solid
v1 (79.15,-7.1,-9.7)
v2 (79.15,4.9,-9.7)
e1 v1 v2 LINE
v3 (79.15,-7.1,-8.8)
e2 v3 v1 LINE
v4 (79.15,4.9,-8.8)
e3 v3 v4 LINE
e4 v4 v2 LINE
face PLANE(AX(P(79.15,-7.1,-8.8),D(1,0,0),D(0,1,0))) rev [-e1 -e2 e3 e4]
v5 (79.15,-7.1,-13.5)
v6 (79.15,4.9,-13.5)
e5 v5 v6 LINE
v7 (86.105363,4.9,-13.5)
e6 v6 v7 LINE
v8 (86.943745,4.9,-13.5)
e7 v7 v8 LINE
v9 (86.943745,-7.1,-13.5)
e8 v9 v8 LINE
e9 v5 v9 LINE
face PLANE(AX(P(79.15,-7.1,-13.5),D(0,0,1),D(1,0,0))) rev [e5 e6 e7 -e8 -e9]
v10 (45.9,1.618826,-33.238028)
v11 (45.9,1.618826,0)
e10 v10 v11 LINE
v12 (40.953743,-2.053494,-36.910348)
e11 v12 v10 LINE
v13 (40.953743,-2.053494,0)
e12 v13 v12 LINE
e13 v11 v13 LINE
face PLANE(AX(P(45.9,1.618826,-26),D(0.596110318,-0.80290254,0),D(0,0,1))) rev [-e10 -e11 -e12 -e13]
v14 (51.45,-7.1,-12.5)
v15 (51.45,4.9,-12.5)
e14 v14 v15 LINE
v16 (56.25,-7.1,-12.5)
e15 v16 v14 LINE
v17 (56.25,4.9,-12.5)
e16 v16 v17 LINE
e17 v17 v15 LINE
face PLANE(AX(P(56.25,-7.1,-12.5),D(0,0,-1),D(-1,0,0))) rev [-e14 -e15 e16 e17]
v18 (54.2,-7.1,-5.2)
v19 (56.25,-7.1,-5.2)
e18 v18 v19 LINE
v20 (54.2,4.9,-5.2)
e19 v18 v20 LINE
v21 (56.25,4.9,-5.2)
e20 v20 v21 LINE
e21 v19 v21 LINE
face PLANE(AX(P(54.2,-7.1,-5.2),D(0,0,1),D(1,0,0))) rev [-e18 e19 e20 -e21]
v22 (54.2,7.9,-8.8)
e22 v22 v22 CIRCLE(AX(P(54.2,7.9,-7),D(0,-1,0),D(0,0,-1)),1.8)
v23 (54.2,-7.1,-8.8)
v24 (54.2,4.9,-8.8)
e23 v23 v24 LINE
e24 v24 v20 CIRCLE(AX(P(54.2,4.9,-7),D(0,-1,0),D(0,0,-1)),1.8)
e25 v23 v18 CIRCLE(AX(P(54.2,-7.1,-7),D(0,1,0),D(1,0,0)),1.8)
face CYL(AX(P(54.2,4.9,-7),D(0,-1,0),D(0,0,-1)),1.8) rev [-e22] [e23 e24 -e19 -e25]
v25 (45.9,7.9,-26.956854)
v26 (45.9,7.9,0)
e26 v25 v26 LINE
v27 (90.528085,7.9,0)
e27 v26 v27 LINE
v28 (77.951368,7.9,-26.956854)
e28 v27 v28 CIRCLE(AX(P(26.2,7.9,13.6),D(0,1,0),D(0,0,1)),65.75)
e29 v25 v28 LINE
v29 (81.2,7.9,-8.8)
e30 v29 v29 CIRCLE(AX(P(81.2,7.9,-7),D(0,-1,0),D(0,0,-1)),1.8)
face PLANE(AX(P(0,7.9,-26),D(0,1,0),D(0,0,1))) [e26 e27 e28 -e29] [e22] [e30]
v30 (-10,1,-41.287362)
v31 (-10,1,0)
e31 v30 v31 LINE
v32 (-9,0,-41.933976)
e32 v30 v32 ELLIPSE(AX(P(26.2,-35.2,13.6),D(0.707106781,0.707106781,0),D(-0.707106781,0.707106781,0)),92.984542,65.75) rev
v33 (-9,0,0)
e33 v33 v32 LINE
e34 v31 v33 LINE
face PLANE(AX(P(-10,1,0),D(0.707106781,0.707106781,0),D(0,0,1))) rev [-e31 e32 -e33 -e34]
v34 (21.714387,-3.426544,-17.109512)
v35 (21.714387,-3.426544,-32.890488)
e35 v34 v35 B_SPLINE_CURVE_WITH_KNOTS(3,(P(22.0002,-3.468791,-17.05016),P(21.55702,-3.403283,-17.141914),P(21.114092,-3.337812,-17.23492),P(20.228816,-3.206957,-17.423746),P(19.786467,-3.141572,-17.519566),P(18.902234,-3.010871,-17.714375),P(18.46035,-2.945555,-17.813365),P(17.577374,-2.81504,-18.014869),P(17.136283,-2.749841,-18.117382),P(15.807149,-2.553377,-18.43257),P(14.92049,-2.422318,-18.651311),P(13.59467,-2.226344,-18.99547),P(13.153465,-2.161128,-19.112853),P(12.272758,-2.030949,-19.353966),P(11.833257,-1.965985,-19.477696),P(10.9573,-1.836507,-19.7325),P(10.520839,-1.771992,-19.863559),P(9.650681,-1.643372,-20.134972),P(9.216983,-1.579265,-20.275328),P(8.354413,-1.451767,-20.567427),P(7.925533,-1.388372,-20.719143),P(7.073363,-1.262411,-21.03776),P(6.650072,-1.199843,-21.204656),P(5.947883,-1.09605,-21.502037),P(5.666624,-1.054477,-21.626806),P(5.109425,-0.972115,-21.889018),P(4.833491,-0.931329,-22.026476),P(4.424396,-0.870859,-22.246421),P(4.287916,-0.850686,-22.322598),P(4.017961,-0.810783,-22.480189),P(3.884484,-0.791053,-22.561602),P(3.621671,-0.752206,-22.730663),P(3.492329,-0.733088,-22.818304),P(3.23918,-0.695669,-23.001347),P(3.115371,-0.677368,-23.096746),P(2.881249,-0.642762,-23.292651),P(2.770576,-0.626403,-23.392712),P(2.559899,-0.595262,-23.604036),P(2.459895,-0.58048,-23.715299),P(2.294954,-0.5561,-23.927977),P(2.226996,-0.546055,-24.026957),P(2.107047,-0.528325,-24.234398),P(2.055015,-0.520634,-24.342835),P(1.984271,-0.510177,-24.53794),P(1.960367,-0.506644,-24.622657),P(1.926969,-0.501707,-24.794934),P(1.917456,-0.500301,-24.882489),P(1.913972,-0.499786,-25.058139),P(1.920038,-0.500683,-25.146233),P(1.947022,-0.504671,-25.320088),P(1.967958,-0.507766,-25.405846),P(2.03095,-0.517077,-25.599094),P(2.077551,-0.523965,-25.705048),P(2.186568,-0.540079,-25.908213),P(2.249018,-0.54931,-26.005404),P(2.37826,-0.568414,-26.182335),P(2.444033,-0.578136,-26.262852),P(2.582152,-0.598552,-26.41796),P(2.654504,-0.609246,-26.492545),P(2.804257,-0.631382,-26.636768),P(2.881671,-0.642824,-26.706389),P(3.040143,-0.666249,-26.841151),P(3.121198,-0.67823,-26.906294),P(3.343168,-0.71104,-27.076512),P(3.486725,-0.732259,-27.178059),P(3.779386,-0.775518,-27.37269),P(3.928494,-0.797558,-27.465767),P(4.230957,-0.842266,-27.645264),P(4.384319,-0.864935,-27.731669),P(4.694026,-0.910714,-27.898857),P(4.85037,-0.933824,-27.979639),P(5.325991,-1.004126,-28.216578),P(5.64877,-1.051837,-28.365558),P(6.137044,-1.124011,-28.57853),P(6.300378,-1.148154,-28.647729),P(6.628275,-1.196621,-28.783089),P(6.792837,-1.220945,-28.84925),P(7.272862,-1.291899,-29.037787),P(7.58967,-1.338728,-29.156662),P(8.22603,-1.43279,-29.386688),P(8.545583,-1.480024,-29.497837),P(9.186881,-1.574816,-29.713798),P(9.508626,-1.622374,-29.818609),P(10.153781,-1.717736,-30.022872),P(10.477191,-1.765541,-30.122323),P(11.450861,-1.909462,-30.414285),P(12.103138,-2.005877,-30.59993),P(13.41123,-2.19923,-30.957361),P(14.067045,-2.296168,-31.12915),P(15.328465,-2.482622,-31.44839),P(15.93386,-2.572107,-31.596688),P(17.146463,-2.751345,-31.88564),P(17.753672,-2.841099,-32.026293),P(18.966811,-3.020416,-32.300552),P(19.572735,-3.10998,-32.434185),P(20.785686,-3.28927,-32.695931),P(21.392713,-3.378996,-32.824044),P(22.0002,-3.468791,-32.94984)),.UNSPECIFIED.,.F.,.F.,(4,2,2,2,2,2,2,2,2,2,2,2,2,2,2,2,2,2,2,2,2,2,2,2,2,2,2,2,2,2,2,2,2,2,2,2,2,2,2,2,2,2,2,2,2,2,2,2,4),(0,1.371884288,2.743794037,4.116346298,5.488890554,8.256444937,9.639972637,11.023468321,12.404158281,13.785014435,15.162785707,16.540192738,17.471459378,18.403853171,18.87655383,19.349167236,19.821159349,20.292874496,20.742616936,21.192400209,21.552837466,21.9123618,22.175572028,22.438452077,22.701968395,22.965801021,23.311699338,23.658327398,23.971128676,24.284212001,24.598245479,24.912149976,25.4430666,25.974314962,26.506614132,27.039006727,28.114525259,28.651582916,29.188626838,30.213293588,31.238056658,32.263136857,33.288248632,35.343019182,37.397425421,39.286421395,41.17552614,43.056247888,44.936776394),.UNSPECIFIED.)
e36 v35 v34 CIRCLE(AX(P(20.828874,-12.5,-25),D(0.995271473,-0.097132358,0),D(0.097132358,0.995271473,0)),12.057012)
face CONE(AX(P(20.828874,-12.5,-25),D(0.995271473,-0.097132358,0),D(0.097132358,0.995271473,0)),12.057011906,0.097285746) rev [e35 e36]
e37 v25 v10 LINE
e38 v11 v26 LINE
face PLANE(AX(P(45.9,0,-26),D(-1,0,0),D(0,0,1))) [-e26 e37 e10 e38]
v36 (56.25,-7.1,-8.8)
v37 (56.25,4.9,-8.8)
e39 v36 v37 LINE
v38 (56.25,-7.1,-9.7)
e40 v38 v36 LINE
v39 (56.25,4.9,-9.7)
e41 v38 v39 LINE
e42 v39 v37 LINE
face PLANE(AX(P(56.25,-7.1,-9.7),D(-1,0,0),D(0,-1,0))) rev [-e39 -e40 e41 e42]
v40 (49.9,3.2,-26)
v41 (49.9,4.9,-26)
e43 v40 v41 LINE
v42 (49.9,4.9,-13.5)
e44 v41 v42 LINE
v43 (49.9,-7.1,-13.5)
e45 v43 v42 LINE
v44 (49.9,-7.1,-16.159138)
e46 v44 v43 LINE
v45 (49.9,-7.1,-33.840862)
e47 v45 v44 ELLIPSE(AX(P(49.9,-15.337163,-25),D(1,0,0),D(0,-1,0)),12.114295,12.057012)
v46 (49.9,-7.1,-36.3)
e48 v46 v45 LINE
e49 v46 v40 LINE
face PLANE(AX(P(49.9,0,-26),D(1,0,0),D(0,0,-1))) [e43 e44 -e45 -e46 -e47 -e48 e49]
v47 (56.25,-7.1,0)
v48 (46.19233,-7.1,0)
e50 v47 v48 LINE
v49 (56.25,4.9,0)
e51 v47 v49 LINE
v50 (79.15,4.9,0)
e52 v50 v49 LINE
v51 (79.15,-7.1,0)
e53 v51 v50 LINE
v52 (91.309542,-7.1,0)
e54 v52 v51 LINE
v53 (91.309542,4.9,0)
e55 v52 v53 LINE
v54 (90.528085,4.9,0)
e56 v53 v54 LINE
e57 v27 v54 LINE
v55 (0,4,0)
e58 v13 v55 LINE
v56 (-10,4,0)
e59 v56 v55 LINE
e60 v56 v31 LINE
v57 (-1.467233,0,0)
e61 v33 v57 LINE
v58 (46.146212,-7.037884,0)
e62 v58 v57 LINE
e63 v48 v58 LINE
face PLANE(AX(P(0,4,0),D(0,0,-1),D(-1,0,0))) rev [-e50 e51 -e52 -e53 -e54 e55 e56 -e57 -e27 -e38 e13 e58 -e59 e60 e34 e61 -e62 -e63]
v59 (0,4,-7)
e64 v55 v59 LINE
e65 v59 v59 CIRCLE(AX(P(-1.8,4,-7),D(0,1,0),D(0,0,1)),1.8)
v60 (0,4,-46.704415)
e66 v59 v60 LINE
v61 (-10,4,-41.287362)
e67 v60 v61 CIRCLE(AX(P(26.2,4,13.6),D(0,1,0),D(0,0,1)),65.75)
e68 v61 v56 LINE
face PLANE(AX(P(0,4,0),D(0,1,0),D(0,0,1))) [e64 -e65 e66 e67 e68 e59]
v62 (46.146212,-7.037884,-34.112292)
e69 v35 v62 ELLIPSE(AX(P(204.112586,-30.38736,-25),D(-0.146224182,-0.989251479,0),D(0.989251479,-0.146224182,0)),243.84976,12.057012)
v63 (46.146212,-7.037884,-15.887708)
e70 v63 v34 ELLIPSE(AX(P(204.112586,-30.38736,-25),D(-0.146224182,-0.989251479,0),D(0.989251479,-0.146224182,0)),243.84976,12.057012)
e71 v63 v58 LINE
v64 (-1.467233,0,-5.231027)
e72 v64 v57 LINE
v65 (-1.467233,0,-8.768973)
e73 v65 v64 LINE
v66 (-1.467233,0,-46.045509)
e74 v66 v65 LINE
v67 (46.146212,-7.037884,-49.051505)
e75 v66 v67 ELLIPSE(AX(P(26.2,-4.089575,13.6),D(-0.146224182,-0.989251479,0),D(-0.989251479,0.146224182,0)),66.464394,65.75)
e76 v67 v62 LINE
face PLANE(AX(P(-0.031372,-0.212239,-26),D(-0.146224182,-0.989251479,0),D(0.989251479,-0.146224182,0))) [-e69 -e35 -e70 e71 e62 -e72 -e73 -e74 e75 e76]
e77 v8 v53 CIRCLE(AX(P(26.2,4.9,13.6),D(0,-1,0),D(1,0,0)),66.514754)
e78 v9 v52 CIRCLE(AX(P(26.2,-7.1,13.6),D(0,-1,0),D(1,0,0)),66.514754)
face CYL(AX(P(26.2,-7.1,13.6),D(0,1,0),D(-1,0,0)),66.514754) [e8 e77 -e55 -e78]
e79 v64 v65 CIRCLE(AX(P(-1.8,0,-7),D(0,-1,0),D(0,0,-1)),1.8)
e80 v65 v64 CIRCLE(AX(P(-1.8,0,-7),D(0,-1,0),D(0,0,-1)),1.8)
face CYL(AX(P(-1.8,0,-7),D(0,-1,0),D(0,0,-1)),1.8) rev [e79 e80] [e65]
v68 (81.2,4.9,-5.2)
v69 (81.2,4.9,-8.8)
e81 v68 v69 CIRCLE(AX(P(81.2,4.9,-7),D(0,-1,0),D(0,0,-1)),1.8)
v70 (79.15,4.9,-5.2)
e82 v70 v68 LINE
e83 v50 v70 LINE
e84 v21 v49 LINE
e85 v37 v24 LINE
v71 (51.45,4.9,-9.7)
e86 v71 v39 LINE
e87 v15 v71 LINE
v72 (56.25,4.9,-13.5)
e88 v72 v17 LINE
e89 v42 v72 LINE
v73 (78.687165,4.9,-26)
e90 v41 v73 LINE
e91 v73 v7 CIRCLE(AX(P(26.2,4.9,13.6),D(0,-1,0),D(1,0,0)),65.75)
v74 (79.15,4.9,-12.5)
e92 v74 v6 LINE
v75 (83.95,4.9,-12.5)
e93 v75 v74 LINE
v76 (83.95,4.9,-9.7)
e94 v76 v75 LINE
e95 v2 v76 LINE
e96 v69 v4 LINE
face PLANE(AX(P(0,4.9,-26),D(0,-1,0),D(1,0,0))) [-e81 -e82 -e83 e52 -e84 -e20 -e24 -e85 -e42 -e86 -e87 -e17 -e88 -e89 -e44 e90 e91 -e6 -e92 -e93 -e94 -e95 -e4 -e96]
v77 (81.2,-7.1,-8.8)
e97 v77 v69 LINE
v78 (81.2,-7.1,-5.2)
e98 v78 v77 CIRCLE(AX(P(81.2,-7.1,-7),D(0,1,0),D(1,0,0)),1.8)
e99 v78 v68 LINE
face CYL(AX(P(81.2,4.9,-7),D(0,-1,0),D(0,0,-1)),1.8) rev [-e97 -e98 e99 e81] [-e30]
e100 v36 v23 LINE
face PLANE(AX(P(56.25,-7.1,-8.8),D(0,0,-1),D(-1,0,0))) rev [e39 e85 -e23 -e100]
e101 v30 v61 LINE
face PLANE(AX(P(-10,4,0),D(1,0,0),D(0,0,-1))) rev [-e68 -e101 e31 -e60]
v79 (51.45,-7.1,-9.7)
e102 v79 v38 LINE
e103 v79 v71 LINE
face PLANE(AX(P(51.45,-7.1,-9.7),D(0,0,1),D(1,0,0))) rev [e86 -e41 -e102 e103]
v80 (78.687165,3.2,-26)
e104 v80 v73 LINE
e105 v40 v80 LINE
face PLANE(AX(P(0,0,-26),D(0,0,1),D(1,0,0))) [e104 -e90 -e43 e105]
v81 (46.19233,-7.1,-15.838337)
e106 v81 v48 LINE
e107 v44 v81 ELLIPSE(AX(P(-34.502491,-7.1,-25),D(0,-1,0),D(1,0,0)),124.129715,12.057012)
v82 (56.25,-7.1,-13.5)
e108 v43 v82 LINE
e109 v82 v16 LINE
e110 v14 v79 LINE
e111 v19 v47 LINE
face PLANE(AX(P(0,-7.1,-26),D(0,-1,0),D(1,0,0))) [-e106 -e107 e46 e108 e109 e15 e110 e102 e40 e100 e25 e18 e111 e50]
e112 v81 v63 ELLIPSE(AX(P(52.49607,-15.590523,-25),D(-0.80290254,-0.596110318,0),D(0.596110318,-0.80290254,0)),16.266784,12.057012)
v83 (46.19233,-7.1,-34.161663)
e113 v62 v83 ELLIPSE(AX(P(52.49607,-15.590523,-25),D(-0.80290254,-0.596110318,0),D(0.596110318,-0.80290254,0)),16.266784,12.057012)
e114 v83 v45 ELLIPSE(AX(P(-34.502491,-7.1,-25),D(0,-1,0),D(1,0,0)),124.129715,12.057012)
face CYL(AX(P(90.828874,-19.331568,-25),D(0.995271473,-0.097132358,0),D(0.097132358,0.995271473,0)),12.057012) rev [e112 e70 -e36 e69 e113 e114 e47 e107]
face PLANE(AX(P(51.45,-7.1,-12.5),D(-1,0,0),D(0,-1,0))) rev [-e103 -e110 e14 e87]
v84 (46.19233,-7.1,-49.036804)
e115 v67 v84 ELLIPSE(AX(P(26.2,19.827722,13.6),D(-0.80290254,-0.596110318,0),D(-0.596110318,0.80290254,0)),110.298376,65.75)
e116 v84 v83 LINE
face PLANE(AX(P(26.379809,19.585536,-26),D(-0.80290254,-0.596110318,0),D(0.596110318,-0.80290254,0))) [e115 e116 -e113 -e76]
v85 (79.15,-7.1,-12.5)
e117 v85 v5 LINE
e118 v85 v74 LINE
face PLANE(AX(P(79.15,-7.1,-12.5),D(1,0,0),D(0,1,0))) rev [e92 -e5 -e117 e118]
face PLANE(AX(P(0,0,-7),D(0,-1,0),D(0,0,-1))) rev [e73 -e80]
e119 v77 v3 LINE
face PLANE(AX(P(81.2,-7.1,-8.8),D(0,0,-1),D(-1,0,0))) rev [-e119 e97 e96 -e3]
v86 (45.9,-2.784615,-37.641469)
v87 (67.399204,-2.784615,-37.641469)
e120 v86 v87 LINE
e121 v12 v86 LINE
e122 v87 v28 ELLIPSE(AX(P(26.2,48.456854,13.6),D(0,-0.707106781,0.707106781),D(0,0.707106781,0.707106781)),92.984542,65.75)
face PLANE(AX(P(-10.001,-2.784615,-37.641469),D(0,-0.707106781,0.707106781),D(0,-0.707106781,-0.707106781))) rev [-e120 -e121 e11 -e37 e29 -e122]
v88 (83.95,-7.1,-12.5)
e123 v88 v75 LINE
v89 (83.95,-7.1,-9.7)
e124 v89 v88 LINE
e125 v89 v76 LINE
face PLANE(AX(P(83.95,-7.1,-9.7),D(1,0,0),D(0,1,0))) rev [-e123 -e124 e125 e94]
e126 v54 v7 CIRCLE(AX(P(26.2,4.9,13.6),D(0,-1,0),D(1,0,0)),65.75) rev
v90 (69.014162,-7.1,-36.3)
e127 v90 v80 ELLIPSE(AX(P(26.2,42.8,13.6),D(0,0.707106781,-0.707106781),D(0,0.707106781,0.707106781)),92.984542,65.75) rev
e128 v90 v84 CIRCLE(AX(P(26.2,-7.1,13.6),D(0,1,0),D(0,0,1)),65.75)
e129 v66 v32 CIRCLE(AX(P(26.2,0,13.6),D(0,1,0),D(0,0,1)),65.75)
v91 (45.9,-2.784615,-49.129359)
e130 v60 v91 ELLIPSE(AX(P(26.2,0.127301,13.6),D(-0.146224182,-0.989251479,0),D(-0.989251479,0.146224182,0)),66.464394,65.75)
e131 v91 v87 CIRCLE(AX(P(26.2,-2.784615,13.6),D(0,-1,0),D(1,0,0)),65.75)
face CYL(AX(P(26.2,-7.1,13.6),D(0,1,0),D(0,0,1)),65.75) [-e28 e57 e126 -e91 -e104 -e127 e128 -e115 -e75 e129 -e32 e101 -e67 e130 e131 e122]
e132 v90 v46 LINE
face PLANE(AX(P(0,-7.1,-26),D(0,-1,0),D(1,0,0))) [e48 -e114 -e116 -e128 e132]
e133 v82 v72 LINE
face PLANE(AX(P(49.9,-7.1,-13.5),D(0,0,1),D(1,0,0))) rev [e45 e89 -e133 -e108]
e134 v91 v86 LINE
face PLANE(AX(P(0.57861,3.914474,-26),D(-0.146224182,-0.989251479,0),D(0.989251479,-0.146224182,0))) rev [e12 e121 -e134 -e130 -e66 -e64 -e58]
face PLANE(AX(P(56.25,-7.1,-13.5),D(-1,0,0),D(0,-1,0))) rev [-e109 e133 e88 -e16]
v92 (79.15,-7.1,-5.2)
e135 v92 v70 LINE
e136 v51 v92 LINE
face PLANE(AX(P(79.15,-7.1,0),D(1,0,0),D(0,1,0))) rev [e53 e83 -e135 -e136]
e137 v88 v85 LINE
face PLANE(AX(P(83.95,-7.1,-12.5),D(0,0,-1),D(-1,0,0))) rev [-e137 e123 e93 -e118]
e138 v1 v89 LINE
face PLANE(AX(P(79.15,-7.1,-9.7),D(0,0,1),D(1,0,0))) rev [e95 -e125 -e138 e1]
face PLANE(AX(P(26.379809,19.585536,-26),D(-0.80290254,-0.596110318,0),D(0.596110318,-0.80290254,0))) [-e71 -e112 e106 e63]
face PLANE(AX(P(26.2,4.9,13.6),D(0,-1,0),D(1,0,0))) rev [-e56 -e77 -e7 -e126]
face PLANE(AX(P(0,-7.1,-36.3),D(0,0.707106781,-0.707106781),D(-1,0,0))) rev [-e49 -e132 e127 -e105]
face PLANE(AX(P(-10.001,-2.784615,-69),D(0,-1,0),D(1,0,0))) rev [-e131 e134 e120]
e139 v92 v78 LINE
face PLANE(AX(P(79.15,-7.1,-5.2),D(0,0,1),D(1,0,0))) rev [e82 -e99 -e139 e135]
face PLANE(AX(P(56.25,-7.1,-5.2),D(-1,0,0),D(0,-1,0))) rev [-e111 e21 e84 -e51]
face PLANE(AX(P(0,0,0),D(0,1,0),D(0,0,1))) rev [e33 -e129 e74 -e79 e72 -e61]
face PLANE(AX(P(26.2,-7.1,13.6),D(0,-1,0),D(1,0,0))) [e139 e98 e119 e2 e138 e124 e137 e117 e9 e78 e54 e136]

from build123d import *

# Parameters (mm, degrees)
SKETCH1_W            = 10
SKETCH1_H            = 10
BOSS_EXTRUDE1_DEPTH  = 4
CHAMFER1_SIZE        = 1
BOSS_EXTRUDE2_DEPTH  = 16
BOSS_EXTRUDE3_DEPTH  = 10
BOSS_EXTRUDE4_DEPTH  = 13
CHAMFER2_SIZE        = 10.3
BOSS_EXTRUDE5_DEPTH  = 30
CUT_EXTRUDE2_REACH   = 128.642
CUT_EXTRUDE1_START   = -15
CUT_EXTRUDE1_DEPTH   = 15
M3_CLEARANCE_HOLE1_D = 3.6
SKETCH11_W           = 1.8
SKETCH11_H           = 7.9
CHAMFER3_SIZE        = 5
CHAMFER3_SIZE2       = 4.40344093
BOSS_EXTRUDE6_DEPTH  = 12


# Read off the part's stored shape, not the designer's step: Cut-Extrude1
with BuildPart() as part:
    # Sketch1 → Boss-Extrude1 (new body)
    with BuildSketch(Plane(origin=(0, 0, 0), x_dir=(1, 0, 0), z_dir=(0, 1, 0))):
        with Locations((-5, 5)):
            Rectangle(SKETCH1_W, SKETCH1_H)
    extrude(amount=BOSS_EXTRUDE1_DEPTH)

    # Chamfer1
    chamfer1_edges = [part.edges().sort_by_distance(p)[0] for p in [
        (-10, 0, -5),
    ]]
    chamfer(chamfer1_edges, length=CHAMFER1_SIZE)

    # Sketch2 → Boss-Extrude2 (add)
    with BuildSketch(Plane(origin=(0, 0, -10), x_dir=(-1, 0, 0), z_dir=(0, 0, -1))):
        Polygon((10, 4), (0, 4), (-45.9, -2.784614526), (-45.9, 7.9), (-95.9, 7.9), (-95.9, 4.9), (-49.9, 4.9), (-49.9, -7.1), (-46.192330133, -7.1), (-46.146212438, -7.037883956), (1.467233005, 0), (9, 0), (10, 1), align=None)
    extrude(amount=BOSS_EXTRUDE2_DEPTH)

    # Sketch2<4> → Boss-Extrude3 (add)
    with BuildSketch(Plane(origin=(0, 0, -10), x_dir=(-1, 0, 0), z_dir=(0, 0, -1))):
        Polygon((1.467233005, 0), (0, 0), (0, 4), (-45.9, -2.784614526), (-45.9, 7.9), (-95.9, 7.9), (-95.9, 4.9), (-49.9, 4.9), (-49.9, -7.1), (-46.192330133, -7.1), (-46.146212438, -7.037883956), align=None)
    extrude(amount=-BOSS_EXTRUDE3_DEPTH)

    # Sketch3 → Boss-Extrude4 (add)
    with BuildSketch(Plane(origin=(0, 0, -26), x_dir=(-1, 0, 0), z_dir=(0, 0, -1))):
        Polygon((-95.9, 4.9), (-95.9, -7.1), (-49.9, -7.1), (-46.192330133, -7.1), (-46.146212438, -7.037883956), (1.467233005, 0), (9, 0), (10, 1), (10, 4), (0, 4), (-45.9, -2.784614526), (-45.9, 7.9), (-95.9, 7.9), align=None)
    extrude(amount=BOSS_EXTRUDE4_DEPTH)

    # Chamfer2
    chamfer2_edges = [part.edges().sort_by_distance(p)[0] for p in [
        (72.9, -7.1, -26),
    ]]
    chamfer(chamfer2_edges, length=CHAMFER2_SIZE)

    # Sketch4 → Boss-Extrude5 (add)
    with BuildSketch(Plane(origin=(0, 0, -39), x_dir=(-1, 0, 0), z_dir=(0, 0, -1))):
        Polygon((-95.9, 7.9), (-95.9, -7.1), (-46.192330133, -7.1), (-46.146212438, -7.037883956), (1.467233005, 0), (9, 0), (10, 1), (10, 4), (0, 4), (-45.9, -2.784614526), (-45.9, 7.9), align=None)
    extrude(amount=BOSS_EXTRUDE5_DEPTH)

    # Sketch15 → Cut-Extrude2 (cut, up to next)
    with BuildSketch(Plane(origin=(95.9, 0, 0), x_dir=(0, 0, -1), z_dir=(1, 0, 0)), mode=Mode.PRIVATE) as cut_extrude2_sk1:
        Polygon((69, -2.784614526), (37.641468776, -2.784614526), (26.956854249, 7.9), (69, 7.9), align=None)
    cut_extrude2_tool1 = extrude(cut_extrude2_sk1.sketch, amount=-CUT_EXTRUDE2_REACH, mode=Mode.PRIVATE) & part.part
    add(cut_extrude2_tool1.solids().sort_by_distance((95.9, 2.816908, -50.519973))[0], mode=Mode.SUBTRACT)

    # Cut-Extrude1 outline → Cut-Extrude1 (cut)
    with BuildSketch(Plane(origin=(0, 7.9, 0), x_dir=(1, 0, 0), z_dir=(0, 1, 0)).offset(CUT_EXTRUDE1_START)):
        with BuildLine():
            Line((90.528084846, 0), (95.9, 0))
            Line((95.9, 0), (95.9, 69))
            Line((95.9, 69), (-10, 69))
            Line((-10, 69), (-10, 41.287361933))
            ThreePointArc((-10, 41.287361933), (51.179168383, 47.220256879), (90.528084846, 0))
        make_face()
    extrude(amount=CUT_EXTRUDE1_DEPTH, mode=Mode.SUBTRACT)

    # M3 Clearance Hole1 (through all)
    with Locations(Plane(origin=(0, 4.9, 0), x_dir=(-1, 0, 0), z_dir=(0, -1, 0))):
        with Locations((-81.2, 7), (-54.2, 7)):
            Hole(M3_CLEARANCE_HOLE1_D / 2)

    # Sketch11 → M3 Clearance Hole2 (revolve, cut)
    with BuildSketch(Plane(origin=(-1.8, 0, -7), x_dir=(0, 0, -1), z_dir=(1, 0, 0))):
        with Locations((0.9, 3.95)):
            Rectangle(SKETCH11_W, SKETCH11_H)
    revolve(axis=Axis((-1.8, -6.35, -7), (0, 1, 0)), mode=Mode.SUBTRACT)

    # Chamfer3
    chamfer3_edges = [part.edges().sort_by_distance(p)[0] for p in [
        (45.9, -2.784614526, -18.820734388),
    ]]
    chamfer3_side = [part.faces().sort_by_distance(p)[0] for p in [
        (23.128110629, 0.581365679, -25.371340031),
    ]]
    chamfer(chamfer3_edges, length=CHAMFER3_SIZE, length2=CHAMFER3_SIZE2, reference=chamfer3_side[0])

    # Sketch12 → Cut-Revolve1 (revolve, cut)
    with BuildSketch(Plane.XY.offset(-25)):
        Polygon((0, -0.5), (22, -0.5), (92, -7.331568331), (90.828874, -19.331568331), (0, -10.467230343), align=None)
    revolve(axis=Axis((90.828874, -19.331568331, -25), (-0.9952714730097288, 0.09713235821828223, 0)), mode=Mode.SUBTRACT)

    # Sketch14 → Boss-Extrude6 (add)
    with BuildSketch(Plane.XZ.offset(-4.9)):
        with BuildLine():
            Line((49.9, 0), (49.9, -13.5))
            Line((49.9, -13.5), (56.25, -13.5))
            Line((56.25, -13.5), (56.25, -12.5))
            Line((56.25, -12.5), (51.45, -12.5))
            Line((51.45, -12.5), (51.45, -9.7))
            Line((51.45, -9.7), (56.25, -9.7))
            Line((56.25, -9.7), (56.25, -8.8))
            Line((56.25, -8.8), (54.2, -8.8))
            ThreePointArc((54.2, -8.8), (52.4, -7), (54.2, -5.2))
            Line((54.2, -5.2), (56.25, -5.2))
            Line((56.25, -5.2), (56.25, 0))
            Line((56.25, 0), (49.9, 0))
        make_face()
        with BuildLine():
            Line((79.15, -13.5), (86.943744534, -13.5))
            ThreePointArc((86.943744534, -13.5), (89.487636648, -6.866742476), (91.309542311, 0))
            Line((91.309542311, 0), (79.15, 0))
            Line((79.15, 0), (79.15, -5.2))
            Line((79.15, -5.2), (81.2, -5.2))
            ThreePointArc((81.2, -5.2), (83, -7), (81.2, -8.8))
            Line((81.2, -8.8), (79.15, -8.8))
            Line((79.15, -8.8), (79.15, -9.7))
            Line((79.15, -9.7), (83.95, -9.7))
            Line((83.95, -9.7), (83.95, -12.5))
            Line((83.95, -12.5), (79.15, -12.5))
            Line((79.15, -12.5), (79.15, -13.5))
        make_face()
    extrude(amount=BOSS_EXTRUDE6_DEPTH)


solid = part.part
